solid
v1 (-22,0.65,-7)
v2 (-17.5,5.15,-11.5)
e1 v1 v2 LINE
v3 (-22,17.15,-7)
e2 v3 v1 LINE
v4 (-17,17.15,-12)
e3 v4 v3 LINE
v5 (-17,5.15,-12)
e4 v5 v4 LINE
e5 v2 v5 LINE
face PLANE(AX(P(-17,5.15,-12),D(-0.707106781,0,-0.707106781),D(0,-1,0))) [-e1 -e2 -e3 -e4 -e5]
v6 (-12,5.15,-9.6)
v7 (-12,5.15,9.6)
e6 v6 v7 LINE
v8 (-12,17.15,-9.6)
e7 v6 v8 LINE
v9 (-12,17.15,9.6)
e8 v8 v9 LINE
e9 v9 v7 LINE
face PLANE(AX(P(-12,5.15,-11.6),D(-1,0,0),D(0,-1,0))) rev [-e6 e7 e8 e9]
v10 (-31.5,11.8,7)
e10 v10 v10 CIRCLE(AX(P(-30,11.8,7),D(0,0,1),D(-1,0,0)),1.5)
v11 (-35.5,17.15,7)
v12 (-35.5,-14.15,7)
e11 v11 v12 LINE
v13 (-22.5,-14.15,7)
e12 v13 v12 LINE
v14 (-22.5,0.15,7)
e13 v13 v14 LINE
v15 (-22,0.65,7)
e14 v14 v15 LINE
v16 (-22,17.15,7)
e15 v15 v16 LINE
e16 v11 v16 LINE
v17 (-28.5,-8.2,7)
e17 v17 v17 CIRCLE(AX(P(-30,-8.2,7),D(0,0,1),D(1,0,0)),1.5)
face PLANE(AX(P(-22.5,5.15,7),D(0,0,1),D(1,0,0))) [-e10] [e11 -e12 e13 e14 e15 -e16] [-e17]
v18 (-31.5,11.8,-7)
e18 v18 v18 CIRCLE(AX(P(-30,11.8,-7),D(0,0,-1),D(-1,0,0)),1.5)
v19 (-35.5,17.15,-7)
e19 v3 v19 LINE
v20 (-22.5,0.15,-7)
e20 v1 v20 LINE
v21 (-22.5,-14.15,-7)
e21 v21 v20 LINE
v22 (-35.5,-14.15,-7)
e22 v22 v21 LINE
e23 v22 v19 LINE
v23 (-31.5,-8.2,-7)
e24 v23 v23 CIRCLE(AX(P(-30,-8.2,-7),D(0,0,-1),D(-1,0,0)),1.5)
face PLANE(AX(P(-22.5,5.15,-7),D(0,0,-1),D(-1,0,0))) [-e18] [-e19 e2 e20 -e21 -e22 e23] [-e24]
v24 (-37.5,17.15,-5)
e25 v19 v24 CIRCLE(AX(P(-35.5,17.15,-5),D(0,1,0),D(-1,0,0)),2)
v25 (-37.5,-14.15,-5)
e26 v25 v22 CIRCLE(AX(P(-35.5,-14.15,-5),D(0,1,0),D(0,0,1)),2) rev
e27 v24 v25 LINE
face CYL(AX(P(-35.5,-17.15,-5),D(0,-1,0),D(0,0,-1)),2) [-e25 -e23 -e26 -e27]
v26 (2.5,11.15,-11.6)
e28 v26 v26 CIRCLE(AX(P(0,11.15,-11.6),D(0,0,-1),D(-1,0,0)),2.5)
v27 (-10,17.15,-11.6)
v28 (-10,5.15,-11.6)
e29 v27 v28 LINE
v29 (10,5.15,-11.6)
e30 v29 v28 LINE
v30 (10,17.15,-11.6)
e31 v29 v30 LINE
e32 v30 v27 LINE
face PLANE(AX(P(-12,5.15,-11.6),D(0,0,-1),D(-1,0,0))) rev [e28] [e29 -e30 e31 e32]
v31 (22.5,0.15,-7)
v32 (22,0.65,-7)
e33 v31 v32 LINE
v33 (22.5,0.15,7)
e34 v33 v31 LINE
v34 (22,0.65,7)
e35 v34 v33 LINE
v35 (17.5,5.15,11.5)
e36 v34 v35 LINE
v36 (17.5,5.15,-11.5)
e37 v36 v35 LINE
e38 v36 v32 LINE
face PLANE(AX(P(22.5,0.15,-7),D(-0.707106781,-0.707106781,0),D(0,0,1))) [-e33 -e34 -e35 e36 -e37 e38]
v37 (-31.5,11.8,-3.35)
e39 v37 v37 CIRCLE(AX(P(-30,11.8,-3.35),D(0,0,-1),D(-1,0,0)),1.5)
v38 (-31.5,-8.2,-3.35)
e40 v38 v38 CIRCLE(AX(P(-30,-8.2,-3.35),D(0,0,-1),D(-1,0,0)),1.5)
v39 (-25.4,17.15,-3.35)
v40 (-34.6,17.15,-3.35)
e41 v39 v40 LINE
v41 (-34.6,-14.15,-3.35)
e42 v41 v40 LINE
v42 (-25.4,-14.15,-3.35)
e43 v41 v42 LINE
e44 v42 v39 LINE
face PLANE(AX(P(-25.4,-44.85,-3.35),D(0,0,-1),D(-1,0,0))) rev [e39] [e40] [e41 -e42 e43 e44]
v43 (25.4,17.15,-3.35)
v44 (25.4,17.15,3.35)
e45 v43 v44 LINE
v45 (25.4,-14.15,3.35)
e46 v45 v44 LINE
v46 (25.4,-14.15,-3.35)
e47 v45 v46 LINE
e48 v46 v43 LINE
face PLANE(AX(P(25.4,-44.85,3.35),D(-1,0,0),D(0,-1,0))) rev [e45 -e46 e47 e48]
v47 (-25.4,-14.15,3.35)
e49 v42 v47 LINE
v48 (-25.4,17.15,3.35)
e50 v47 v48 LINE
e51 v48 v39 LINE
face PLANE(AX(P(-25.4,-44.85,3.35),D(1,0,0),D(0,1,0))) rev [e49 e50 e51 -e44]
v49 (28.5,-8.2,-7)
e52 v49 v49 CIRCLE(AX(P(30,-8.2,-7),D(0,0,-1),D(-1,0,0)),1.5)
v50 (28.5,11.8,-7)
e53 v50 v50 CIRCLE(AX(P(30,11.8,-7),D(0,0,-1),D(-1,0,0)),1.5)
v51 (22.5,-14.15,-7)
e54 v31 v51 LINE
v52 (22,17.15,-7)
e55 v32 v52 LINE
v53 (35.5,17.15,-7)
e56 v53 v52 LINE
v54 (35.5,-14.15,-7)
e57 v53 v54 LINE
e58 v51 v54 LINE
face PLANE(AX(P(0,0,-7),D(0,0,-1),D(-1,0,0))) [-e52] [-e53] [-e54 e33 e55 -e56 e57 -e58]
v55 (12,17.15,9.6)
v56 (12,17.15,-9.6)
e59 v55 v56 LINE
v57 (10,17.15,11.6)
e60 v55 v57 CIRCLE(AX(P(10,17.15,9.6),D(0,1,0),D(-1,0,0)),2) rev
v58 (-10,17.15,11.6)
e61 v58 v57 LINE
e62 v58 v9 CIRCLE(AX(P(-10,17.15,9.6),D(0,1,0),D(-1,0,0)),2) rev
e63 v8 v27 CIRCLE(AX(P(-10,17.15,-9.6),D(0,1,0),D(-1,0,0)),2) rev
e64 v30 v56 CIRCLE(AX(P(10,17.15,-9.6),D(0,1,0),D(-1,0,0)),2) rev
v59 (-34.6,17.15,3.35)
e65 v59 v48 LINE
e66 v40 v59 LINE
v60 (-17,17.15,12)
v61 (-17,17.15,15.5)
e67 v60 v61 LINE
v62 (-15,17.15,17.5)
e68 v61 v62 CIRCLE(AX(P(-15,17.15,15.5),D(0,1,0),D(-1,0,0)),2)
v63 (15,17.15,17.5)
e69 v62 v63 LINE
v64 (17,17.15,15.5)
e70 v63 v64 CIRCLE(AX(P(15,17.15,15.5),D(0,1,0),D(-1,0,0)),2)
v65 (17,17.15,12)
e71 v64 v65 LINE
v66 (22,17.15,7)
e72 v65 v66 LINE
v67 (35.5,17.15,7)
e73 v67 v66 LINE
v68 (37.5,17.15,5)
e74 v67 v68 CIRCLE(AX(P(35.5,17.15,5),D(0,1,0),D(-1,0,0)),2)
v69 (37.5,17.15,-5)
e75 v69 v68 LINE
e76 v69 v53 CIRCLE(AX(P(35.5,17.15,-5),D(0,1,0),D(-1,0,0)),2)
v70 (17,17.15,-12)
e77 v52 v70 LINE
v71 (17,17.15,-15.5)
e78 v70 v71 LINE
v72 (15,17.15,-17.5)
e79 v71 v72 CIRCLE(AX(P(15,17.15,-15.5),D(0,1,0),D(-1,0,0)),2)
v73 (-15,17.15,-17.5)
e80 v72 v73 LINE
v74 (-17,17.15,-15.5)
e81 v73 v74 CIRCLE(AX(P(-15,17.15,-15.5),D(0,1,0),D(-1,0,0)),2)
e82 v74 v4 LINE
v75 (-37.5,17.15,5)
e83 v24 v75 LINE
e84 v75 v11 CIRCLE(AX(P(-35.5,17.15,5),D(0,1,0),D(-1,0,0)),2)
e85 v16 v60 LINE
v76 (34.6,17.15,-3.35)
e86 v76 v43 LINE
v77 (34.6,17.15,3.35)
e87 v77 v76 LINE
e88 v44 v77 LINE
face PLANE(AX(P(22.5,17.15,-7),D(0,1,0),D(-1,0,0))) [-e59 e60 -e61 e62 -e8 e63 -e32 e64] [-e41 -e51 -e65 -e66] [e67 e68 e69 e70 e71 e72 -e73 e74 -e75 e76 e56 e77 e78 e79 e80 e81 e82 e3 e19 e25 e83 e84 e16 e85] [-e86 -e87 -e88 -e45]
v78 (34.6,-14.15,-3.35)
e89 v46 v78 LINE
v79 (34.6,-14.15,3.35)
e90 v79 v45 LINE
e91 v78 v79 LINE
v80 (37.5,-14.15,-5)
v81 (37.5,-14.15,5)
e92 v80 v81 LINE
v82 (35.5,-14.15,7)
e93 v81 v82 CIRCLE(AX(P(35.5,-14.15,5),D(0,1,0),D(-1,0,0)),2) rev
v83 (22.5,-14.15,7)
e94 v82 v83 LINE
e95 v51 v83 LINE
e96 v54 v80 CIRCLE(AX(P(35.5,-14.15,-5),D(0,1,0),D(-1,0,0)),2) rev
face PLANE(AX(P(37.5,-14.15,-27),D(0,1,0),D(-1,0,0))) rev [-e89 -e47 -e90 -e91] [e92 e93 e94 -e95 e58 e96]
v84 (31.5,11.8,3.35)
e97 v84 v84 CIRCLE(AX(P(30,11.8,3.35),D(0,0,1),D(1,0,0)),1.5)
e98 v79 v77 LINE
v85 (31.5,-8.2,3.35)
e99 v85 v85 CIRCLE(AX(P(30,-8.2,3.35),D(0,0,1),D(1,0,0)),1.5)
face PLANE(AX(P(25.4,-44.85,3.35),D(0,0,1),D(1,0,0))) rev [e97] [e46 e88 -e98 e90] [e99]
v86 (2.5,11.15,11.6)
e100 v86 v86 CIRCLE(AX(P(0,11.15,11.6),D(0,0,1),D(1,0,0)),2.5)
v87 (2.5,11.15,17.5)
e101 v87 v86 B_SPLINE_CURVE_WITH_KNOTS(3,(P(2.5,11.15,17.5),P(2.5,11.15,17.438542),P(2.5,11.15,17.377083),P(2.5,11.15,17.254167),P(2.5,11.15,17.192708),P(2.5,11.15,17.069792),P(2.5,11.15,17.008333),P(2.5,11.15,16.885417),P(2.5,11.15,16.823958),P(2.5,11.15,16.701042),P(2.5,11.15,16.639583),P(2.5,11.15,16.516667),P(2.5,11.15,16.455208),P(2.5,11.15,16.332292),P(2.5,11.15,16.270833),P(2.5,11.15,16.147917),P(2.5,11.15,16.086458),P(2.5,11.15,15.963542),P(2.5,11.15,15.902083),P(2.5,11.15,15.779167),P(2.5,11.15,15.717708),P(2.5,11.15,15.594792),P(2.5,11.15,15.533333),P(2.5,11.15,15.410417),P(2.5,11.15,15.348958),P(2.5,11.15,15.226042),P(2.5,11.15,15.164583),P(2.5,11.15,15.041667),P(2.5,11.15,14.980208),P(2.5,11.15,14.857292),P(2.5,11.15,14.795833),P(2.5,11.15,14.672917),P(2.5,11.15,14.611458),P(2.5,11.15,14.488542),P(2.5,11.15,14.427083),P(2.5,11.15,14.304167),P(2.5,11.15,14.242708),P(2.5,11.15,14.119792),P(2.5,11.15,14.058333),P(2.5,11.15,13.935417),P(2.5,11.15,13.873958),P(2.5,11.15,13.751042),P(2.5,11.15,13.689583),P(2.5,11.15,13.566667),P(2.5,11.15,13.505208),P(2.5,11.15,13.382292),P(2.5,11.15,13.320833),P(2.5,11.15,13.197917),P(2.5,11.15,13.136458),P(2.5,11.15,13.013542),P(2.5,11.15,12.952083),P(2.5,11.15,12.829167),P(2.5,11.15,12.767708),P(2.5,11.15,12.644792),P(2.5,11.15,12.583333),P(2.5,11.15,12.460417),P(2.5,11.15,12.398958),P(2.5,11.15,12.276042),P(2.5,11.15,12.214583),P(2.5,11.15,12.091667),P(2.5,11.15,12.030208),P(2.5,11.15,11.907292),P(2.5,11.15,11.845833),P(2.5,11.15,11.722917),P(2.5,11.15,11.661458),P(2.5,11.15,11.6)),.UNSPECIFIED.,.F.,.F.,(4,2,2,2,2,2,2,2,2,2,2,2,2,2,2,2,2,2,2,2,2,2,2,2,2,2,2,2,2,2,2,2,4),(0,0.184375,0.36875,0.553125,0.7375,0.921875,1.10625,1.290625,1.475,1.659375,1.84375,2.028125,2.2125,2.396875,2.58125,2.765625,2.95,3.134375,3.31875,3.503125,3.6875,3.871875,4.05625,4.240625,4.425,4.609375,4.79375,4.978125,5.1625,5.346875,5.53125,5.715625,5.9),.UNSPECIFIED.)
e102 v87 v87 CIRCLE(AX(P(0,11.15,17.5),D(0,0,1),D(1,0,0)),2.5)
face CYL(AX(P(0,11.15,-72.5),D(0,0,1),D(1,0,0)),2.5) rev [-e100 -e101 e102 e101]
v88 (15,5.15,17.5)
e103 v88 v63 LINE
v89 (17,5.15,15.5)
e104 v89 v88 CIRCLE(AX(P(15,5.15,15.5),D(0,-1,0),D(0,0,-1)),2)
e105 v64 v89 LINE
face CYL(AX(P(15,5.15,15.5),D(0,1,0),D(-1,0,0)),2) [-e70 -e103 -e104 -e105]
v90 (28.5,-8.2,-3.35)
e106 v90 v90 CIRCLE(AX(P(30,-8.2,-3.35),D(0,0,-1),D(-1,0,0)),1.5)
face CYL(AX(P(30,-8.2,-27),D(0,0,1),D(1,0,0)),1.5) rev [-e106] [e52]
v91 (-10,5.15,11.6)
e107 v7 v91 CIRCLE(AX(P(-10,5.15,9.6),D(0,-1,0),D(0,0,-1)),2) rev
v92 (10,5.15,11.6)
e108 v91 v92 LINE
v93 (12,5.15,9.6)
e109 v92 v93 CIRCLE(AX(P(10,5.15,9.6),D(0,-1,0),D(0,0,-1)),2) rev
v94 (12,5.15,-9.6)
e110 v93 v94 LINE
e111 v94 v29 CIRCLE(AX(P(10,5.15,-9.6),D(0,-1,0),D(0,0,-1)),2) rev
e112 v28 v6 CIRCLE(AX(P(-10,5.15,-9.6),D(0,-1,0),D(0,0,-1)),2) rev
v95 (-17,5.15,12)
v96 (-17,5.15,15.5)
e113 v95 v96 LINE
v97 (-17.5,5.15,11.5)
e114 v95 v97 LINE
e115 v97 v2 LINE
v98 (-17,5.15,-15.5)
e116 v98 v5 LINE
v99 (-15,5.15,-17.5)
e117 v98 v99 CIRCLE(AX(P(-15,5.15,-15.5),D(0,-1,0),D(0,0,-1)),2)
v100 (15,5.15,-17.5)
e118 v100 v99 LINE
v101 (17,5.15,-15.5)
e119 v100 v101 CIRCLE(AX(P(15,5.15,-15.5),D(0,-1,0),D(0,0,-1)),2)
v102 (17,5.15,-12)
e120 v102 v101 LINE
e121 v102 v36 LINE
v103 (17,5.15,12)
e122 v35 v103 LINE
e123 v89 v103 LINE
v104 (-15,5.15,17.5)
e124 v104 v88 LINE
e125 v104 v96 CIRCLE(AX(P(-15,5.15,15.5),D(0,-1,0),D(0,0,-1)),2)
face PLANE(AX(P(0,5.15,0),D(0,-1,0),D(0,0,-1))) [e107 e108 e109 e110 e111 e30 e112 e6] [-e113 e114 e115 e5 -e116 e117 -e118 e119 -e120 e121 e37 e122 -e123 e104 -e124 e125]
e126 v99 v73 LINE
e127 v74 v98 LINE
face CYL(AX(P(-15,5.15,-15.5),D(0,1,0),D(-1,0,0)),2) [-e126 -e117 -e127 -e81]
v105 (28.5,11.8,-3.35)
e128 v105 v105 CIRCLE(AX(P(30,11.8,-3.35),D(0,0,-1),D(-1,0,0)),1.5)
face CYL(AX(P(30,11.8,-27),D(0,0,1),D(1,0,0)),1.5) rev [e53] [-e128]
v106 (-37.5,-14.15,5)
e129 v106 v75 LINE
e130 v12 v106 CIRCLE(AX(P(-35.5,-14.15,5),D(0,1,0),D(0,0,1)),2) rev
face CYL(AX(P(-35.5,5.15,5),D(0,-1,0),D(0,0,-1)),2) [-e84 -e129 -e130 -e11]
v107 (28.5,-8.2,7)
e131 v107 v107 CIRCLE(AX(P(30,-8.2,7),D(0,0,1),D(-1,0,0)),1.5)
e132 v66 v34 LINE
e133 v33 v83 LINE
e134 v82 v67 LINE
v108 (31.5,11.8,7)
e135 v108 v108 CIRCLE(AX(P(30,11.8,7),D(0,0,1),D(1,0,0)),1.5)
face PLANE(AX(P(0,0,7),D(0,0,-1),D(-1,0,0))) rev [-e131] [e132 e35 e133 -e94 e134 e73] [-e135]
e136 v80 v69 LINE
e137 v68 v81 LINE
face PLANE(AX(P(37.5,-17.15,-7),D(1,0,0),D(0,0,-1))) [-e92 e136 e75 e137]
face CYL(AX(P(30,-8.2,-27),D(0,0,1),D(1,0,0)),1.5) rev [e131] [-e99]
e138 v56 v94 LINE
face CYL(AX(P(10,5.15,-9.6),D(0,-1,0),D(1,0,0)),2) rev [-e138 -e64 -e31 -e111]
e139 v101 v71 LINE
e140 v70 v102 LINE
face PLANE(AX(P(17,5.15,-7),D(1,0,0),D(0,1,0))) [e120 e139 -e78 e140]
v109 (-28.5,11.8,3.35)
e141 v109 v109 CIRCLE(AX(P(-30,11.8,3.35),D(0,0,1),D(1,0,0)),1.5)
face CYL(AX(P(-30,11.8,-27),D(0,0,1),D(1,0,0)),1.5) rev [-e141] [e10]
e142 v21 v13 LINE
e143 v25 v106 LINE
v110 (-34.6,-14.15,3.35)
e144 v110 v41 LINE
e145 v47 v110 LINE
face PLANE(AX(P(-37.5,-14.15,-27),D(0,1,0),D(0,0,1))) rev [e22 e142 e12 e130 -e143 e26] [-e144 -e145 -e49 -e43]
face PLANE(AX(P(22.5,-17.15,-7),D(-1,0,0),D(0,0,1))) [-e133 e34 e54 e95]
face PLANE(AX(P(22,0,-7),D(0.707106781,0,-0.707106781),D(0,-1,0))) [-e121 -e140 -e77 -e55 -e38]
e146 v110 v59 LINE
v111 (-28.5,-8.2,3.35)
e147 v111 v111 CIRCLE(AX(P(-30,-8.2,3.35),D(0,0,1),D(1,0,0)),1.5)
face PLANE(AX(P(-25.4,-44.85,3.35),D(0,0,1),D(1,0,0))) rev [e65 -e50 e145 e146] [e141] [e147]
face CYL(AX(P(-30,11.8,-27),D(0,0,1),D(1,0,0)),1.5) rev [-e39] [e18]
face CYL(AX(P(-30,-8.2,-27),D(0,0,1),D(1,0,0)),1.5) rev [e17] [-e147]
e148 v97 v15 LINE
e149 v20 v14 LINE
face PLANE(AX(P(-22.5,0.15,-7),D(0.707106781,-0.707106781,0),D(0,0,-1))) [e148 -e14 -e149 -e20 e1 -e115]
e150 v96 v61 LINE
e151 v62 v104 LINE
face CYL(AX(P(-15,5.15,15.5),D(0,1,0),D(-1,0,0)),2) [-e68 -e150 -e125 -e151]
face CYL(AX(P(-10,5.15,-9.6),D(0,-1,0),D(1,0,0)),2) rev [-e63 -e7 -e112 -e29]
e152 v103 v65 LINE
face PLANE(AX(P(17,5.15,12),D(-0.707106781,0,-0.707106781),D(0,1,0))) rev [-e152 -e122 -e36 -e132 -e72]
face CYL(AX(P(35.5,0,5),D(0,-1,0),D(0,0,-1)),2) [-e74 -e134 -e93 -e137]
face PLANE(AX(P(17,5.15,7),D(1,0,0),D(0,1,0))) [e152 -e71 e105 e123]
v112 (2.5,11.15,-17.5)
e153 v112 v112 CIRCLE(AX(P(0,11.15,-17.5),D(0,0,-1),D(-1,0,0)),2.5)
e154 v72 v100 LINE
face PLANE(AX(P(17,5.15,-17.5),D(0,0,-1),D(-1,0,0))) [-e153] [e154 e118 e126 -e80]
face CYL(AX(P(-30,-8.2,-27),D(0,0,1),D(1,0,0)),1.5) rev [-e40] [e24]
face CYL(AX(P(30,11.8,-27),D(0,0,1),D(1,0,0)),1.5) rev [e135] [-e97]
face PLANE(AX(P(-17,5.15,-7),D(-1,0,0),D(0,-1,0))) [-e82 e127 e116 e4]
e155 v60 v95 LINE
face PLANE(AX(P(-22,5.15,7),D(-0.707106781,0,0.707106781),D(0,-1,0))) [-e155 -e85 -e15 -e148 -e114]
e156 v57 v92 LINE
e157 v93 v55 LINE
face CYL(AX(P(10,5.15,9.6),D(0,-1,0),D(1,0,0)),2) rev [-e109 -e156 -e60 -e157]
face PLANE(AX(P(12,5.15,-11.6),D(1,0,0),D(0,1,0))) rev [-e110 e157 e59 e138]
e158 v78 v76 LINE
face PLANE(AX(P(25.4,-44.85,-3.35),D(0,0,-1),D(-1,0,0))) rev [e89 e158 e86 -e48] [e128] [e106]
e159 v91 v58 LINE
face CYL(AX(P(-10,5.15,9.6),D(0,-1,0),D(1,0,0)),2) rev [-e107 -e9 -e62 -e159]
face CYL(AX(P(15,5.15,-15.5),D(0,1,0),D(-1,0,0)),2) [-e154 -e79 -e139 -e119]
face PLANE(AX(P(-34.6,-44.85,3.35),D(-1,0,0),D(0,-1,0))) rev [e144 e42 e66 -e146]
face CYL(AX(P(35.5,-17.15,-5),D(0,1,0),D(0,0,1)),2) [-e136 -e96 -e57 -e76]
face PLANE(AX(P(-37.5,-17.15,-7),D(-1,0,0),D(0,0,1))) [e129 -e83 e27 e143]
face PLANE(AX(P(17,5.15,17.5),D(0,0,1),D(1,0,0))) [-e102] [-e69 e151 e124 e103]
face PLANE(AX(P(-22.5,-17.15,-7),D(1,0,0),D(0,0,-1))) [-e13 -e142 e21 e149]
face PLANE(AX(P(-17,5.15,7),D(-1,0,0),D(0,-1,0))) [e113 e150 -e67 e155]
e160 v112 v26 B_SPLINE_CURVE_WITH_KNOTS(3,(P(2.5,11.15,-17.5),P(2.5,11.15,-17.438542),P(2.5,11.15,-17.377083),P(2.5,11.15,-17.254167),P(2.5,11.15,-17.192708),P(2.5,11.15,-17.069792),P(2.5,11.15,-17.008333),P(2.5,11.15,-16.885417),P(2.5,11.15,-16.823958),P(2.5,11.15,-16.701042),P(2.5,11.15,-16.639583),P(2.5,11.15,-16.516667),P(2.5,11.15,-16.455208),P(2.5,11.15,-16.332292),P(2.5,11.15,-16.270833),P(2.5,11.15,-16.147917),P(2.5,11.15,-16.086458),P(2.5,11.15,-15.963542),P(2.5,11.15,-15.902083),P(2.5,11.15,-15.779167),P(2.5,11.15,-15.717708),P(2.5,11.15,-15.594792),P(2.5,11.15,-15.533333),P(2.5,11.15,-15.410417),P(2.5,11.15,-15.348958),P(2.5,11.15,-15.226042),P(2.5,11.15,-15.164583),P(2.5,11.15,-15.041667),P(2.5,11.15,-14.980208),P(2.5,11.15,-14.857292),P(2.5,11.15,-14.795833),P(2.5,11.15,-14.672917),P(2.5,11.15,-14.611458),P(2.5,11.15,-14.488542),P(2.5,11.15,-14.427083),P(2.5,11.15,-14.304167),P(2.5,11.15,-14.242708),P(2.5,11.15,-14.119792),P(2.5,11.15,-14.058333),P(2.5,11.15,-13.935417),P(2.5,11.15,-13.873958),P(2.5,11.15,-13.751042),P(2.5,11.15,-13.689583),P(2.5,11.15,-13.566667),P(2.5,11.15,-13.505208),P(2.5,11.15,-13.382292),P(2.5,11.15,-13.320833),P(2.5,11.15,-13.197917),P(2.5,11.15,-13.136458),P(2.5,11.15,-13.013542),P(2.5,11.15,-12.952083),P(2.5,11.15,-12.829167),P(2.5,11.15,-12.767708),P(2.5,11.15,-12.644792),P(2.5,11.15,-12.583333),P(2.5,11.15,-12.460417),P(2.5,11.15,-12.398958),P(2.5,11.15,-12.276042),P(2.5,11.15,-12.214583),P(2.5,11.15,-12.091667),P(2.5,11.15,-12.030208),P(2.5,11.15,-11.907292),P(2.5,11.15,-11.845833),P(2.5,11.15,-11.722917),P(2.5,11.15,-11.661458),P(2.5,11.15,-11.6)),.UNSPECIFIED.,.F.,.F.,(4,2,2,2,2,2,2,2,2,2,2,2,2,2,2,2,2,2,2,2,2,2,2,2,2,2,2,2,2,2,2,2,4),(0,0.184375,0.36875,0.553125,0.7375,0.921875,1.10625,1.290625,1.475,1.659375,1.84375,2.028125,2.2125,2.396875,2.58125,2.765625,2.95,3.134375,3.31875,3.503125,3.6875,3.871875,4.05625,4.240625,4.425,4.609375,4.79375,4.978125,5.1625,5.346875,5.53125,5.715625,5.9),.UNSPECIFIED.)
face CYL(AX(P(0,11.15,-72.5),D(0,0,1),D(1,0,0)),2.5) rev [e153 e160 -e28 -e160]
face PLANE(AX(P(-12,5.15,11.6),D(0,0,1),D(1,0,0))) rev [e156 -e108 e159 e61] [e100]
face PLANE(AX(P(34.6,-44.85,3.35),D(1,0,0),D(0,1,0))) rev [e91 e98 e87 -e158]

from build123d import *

# Parameters (mm, degrees)
EXTRUDE_1_DEPTH        = 7
EXTRUDE_1_DEPTH_BACK   = 7
SKETCH_1_W             = 15
SKETCH_1_H             = 34.3
EXTRUDE_1_2_DEPTH      = 7
EXTRUDE_1_2_DEPTH_BACK = 7
SKETCH_2_W             = 9.2
SKETCH_2_H             = 6.7
CUT_EXTRUDE_1_DEPTH    = 62
SKETCH_3_W             = 24
SKETCH_3_H             = 23.2
EXTRUDE_2_DEPTH        = 12
SKETCH_4_R             = 2.5
CUT_EXTRUDE_2_DEPTH    = 90
FILLET_1_R             = 2
CHAMFER_1_SIZE         = 5
CHAMFER_2_SIZE         = 5
FILLET_2_R             = 2
SKETCH_7_R             = 1.5
CUT_EXTRUDE_3_DEPTH    = 34
SKETCH_9_W             = 15
SKETCH_9_H             = 3
CUT_EXTRUDE_4_DEPTH    = 34


with BuildPart() as part:
    # 草图1 → 凸台-拉伸1 (new, two sides: drawn at the far end of the back side and taken through both)
    with BuildSketch(Plane.XY.offset(-EXTRUDE_1_DEPTH_BACK)):
        with Locations((30, 0)):
            Rectangle(SKETCH_1_W, SKETCH_1_H)
    extrude(amount=EXTRUDE_1_DEPTH + EXTRUDE_1_DEPTH_BACK)


with BuildPart() as body_2:
    # 草图1 → Extrude 1 2 (new, two sides: drawn at the far end of the back side and taken through both)
    with BuildSketch(Plane.XY.offset(-EXTRUDE_1_2_DEPTH_BACK)):
        with Locations((-30, 0)):
            Rectangle(SKETCH_1_W, SKETCH_1_H)
    extrude(amount=EXTRUDE_1_2_DEPTH + EXTRUDE_1_2_DEPTH_BACK)


with BuildPart() as cut_extrude_1_tool:
    # 草图2 → 切除-拉伸1 (new body)
    with BuildSketch(Plane(origin=(0, 17.15, 0), x_dir=(1, 0, 0), z_dir=(0, 1, 0))):
        with Locations((30, 0)):
            Rectangle(SKETCH_2_W, SKETCH_2_H)
        with Locations((-30, 0)):
            Rectangle(SKETCH_2_W, SKETCH_2_H)
    extrude(amount=-CUT_EXTRUDE_1_DEPTH)


with BuildPart() as part_1:
    add(part.part)

    # 切除-拉伸1: cut by cut_extrude_1_tool
    add(cut_extrude_1_tool.part, mode=Mode.SUBTRACT)



with BuildPart() as body_2_1:
    add(body_2.part)

    # 切除-拉伸1: cut by cut_extrude_1_tool
    add(cut_extrude_1_tool.part, mode=Mode.SUBTRACT)


with BuildPart() as part_2:
    add(part_1.part)

    add(body_2_1.part)  # 凸台-拉伸2 merges body 2
    # 草图3 → 凸台-拉伸2 (add)
    with BuildSketch(Plane(origin=(0, 17.15, 0), x_dir=(1, 0, 0), z_dir=(0, 1, 0))):
        Polygon((22.5, 7), (17, 7), (17, 17.5), (-17, 17.5), (-17, 7), (-22.5, 7), (-22.5, -7), (-17, -7), (-17, -17.5), (17, -17.5), (17, -7), (22.5, -7), align=None)
        Rectangle(SKETCH_3_W, SKETCH_3_H, mode=Mode.SUBTRACT)
    extrude(amount=-EXTRUDE_2_DEPTH)

    # 草图4 → 切除-拉伸2 (cut)
    with BuildSketch(Plane.XY.offset(17.5)):
        with Locations((0, 11.15)):
            Circle(SKETCH_4_R)
    extrude(amount=-CUT_EXTRUDE_2_DEPTH, mode=Mode.SUBTRACT)

    # 圆角1
    fillet_1_edges = [part_2.edges().sort_by_distance(p)[0] for p in [
        (-37.5, 0, -7),
        (-37.5, 0, 7),
        (37.5, 0, 7),
        (37.5, 0, -7),
    ]]
    fillet(fillet_1_edges, radius=FILLET_1_R)

    # 倒角1
    chamfer_1_edges = [part_2.edges().sort_by_distance(p)[0] for p in [
        (22.5, 5.15, 0),
        (-22.5, 5.15, 0),
    ]]
    chamfer(chamfer_1_edges, length=CHAMFER_1_SIZE)

    # 倒角2
    # the kernel refuses this chamfer: 5 mm, written as the material it adds along each edge
    with BuildSketch(Plane(origin=(17, 17.15, -7), x_dir=(0.9996219169112968, 0, 0.027495876610586147), z_dir=(0, -1, 0))) as chamfer_2_piece_1_section:
        Polygon((CHAMFER_2_SIZE * 0.999621916911, -CHAMFER_2_SIZE * 0.0274958766106), (-CHAMFER_2_SIZE * 0.0274958766106, -CHAMFER_2_SIZE * 0.999621916911), (0, 0), align=None)
    chamfer_2_piece_1 = extrude(amount=12, mode=Mode.PRIVATE)
    chamfer_2_piece_1 = split(chamfer_2_piece_1, bisect_by=Plane(origin=(15.061953737, 7.588046263, -8.643148294), z_dir=(0.7071067811865476, 0.7071067811865475, 0)), keep=Keep.TOP, mode=Mode.PRIVATE)
    add(chamfer_2_piece_1)
    with BuildSketch(Plane(origin=(17, 17.15, -7), x_dir=(0.9996219169112968, 0, 0.027495876610586147), z_dir=(0, -1, 0))) as chamfer_2_piece_2_section:
        Polygon((CHAMFER_2_SIZE * 0.999621916911, -CHAMFER_2_SIZE * 0.0274958766106), (-CHAMFER_2_SIZE * 0.0274958766106, -CHAMFER_2_SIZE * 0.999621916911), (0, 0), align=None)
    chamfer_2_piece_2 = extrude(amount=12, mode=Mode.PRIVATE)
    chamfer_2_piece_2 = split(chamfer_2_piece_2, bisect_by=Plane(origin=(17.181894142, 5.468105858, -9.627776216), z_dir=(-0.7071067811865476, -0.7071067811865475, 0)), keep=Keep.TOP, mode=Mode.PRIVATE)
    add(chamfer_2_piece_2)
    with BuildSketch(Plane(origin=(17, 17.15, -7), x_dir=(0.9996219169112968, 0, 0.027495876610586147), z_dir=(0, -1, 0))) as chamfer_2_piece_3_section:
        Polygon((CHAMFER_2_SIZE * 0.999621916911, -CHAMFER_2_SIZE * 0.0274958766106), (-CHAMFER_2_SIZE * 0.0274958766106, -CHAMFER_2_SIZE * 0.999621916911), (0, 0), align=None)
    chamfer_2_piece_3 = extrude(amount=24.85841494, mode=Mode.PRIVATE)
    chamfer_2_piece_3 = split(chamfer_2_piece_3, bisect_by=Plane(origin=(19.269171179, 3.380828821, -8.010149173), z_dir=(0.7071067811865476, 0.7071067811865475, 0)), keep=Keep.TOP, mode=Mode.PRIVATE)
    chamfer_2_piece_3 = split(chamfer_2_piece_3, bisect_by=Plane(origin=(19.858894906, 5.15, -8.010149173), z_dir=(0, -1, 0)), keep=Keep.TOP, mode=Mode.PRIVATE)
    add(chamfer_2_piece_3)
    with BuildSketch(Plane(origin=(-17, 17.15, -7), x_dir=(0.027495876610586313, 0, -0.9996219169112968), z_dir=(0, -1, 0))) as chamfer_2_piece_4_section:
        Polygon((CHAMFER_2_SIZE * 0.999621916911, -CHAMFER_2_SIZE * 0.0274958766106), (-CHAMFER_2_SIZE * 0.0274958766106, -CHAMFER_2_SIZE * 0.999621916911), (0, 0), align=None)
    chamfer_2_piece_4 = extrude(amount=12, mode=Mode.PRIVATE)
    chamfer_2_piece_4 = split(chamfer_2_piece_4, bisect_by=Plane(origin=(-15.061953737, 7.588046263, -8.643148294), z_dir=(-0.7071067811865475, 0.7071067811865476, 0)), keep=Keep.TOP, mode=Mode.PRIVATE)
    add(chamfer_2_piece_4)
    with BuildSketch(Plane(origin=(-17, 17.15, -7), x_dir=(0.027495876610586313, 0, -0.9996219169112968), z_dir=(0, -1, 0))) as chamfer_2_piece_5_section:
        Polygon((CHAMFER_2_SIZE * 0.999621916911, -CHAMFER_2_SIZE * 0.0274958766106), (-CHAMFER_2_SIZE * 0.0274958766106, -CHAMFER_2_SIZE * 0.999621916911), (0, 0), align=None)
    chamfer_2_piece_5 = extrude(amount=24.85841494, mode=Mode.PRIVATE)
    chamfer_2_piece_5 = split(chamfer_2_piece_5, bisect_by=Plane(origin=(-19.858894906, 5.15, -8.010149173), z_dir=(0, -1, 0)), keep=Keep.TOP, mode=Mode.PRIVATE)
    chamfer_2_piece_5 = split(chamfer_2_piece_5, bisect_by=Plane(origin=(-19.269171179, 3.380828821, -8.010149173), z_dir=(-0.7071067811865475, 0.7071067811865476, 0)), keep=Keep.TOP, mode=Mode.PRIVATE)
    add(chamfer_2_piece_5)
    with BuildSketch(Plane(origin=(-17, 17.15, -7), x_dir=(0.027495876610586313, 0, -0.9996219169112968), z_dir=(0, -1, 0))) as chamfer_2_piece_6_section:
        Polygon((CHAMFER_2_SIZE * 0.999621916911, -CHAMFER_2_SIZE * 0.0274958766106), (-CHAMFER_2_SIZE * 0.0274958766106, -CHAMFER_2_SIZE * 0.999621916911), (0, 0), align=None)
    chamfer_2_piece_6 = extrude(amount=12, mode=Mode.PRIVATE)
    chamfer_2_piece_6 = split(chamfer_2_piece_6, bisect_by=Plane(origin=(-17.181894142, 5.468105858, -9.627776216), z_dir=(0.7071067811865475, -0.7071067811865476, 0)), keep=Keep.TOP, mode=Mode.PRIVATE)
    add(chamfer_2_piece_6)
    with BuildSketch(Plane(origin=(17, 17.15, 7), x_dir=(0.9996219169112968, 0, -0.027495876610586147), z_dir=(0, -1, 0))) as chamfer_2_piece_7_section:
        Polygon((CHAMFER_2_SIZE * 0.999621916911, CHAMFER_2_SIZE * 0.0274958766106), (-CHAMFER_2_SIZE * 0.0274958766106, CHAMFER_2_SIZE * 0.999621916911), (0, 0), align=None)
    chamfer_2_piece_7 = extrude(amount=12, mode=Mode.PRIVATE)
    chamfer_2_piece_7 = split(chamfer_2_piece_7, bisect_by=Plane(origin=(15.061953737, 7.588046263, 8.643148294), z_dir=(0.7071067811865476, 0.7071067811865475, 0)), keep=Keep.TOP, mode=Mode.PRIVATE)
    add(chamfer_2_piece_7)
    with BuildSketch(Plane(origin=(17, 17.15, 7), x_dir=(0.9996219169112968, 0, -0.027495876610586147), z_dir=(0, -1, 0))) as chamfer_2_piece_8_section:
        Polygon((CHAMFER_2_SIZE * 0.999621916911, CHAMFER_2_SIZE * 0.0274958766106), (-CHAMFER_2_SIZE * 0.0274958766106, CHAMFER_2_SIZE * 0.999621916911), (0, 0), align=None)
    chamfer_2_piece_8 = extrude(amount=12, mode=Mode.PRIVATE)
    chamfer_2_piece_8 = split(chamfer_2_piece_8, bisect_by=Plane(origin=(17.181894142, 5.468105858, 9.627776216), z_dir=(-0.7071067811865476, -0.7071067811865475, 0)), keep=Keep.TOP, mode=Mode.PRIVATE)
    add(chamfer_2_piece_8)
    with BuildSketch(Plane(origin=(17, 17.15, 7), x_dir=(0.9996219169112968, 0, -0.027495876610586147), z_dir=(0, -1, 0))) as chamfer_2_piece_9_section:
        Polygon((CHAMFER_2_SIZE * 0.999621916911, CHAMFER_2_SIZE * 0.0274958766106), (-CHAMFER_2_SIZE * 0.0274958766106, CHAMFER_2_SIZE * 0.999621916911), (0, 0), align=None)
    chamfer_2_piece_9 = extrude(amount=24.85841494, mode=Mode.PRIVATE)
    chamfer_2_piece_9 = split(chamfer_2_piece_9, bisect_by=Plane(origin=(19.269171179, 3.380828821, 8.010149173), z_dir=(0.7071067811865476, 0.7071067811865475, 0)), keep=Keep.TOP, mode=Mode.PRIVATE)
    chamfer_2_piece_9 = split(chamfer_2_piece_9, bisect_by=Plane(origin=(19.858894906, 5.15, 8.010149173), z_dir=(0, -1, 0)), keep=Keep.TOP, mode=Mode.PRIVATE)
    add(chamfer_2_piece_9)
    with BuildSketch(Plane(origin=(-17, 17.15, 7), x_dir=(0.027495876610586313, 0, 0.9996219169112968), z_dir=(0, -1, 0))) as chamfer_2_piece_10_section:
        Polygon((CHAMFER_2_SIZE * 0.999621916911, CHAMFER_2_SIZE * 0.0274958766106), (-CHAMFER_2_SIZE * 0.0274958766106, CHAMFER_2_SIZE * 0.999621916911), (0, 0), align=None)
    chamfer_2_piece_10 = extrude(amount=12, mode=Mode.PRIVATE)
    chamfer_2_piece_10 = split(chamfer_2_piece_10, bisect_by=Plane(origin=(-15.061953737, 7.588046263, 8.643148294), z_dir=(-0.7071067811865475, 0.7071067811865476, 0)), keep=Keep.TOP, mode=Mode.PRIVATE)
    add(chamfer_2_piece_10)
    with BuildSketch(Plane(origin=(-17, 17.15, 7), x_dir=(0.027495876610586313, 0, 0.9996219169112968), z_dir=(0, -1, 0))) as chamfer_2_piece_11_section:
        Polygon((CHAMFER_2_SIZE * 0.999621916911, CHAMFER_2_SIZE * 0.0274958766106), (-CHAMFER_2_SIZE * 0.0274958766106, CHAMFER_2_SIZE * 0.999621916911), (0, 0), align=None)
    chamfer_2_piece_11 = extrude(amount=24.85841494, mode=Mode.PRIVATE)
    chamfer_2_piece_11 = split(chamfer_2_piece_11, bisect_by=Plane(origin=(-19.858894906, 5.15, 8.010149173), z_dir=(0, -1, 0)), keep=Keep.TOP, mode=Mode.PRIVATE)
    chamfer_2_piece_11 = split(chamfer_2_piece_11, bisect_by=Plane(origin=(-19.269171179, 3.380828821, 8.010149173), z_dir=(-0.7071067811865475, 0.7071067811865476, 0)), keep=Keep.TOP, mode=Mode.PRIVATE)
    add(chamfer_2_piece_11)
    with BuildSketch(Plane(origin=(-17, 17.15, 7), x_dir=(0.027495876610586313, 0, 0.9996219169112968), z_dir=(0, -1, 0))) as chamfer_2_piece_12_section:
        Polygon((CHAMFER_2_SIZE * 0.999621916911, CHAMFER_2_SIZE * 0.0274958766106), (-CHAMFER_2_SIZE * 0.0274958766106, CHAMFER_2_SIZE * 0.999621916911), (0, 0), align=None)
    chamfer_2_piece_12 = extrude(amount=12, mode=Mode.PRIVATE)
    chamfer_2_piece_12 = split(chamfer_2_piece_12, bisect_by=Plane(origin=(-17.181894142, 5.468105858, 9.627776216), z_dir=(0.7071067811865475, -0.7071067811865476, 0)), keep=Keep.TOP, mode=Mode.PRIVATE)
    add(chamfer_2_piece_12)

    # 圆角2
    fillet_2_edges = [part_2.edges().sort_by_distance(p)[0] for p in [
        (17, 11.15, 17.5),
        (-17, 11.15, 17.5),
        (-17, 11.15, -17.5),
        (17, 11.15, -17.5),
        (12, 11.15, 11.6),
        (-12, 11.15, 11.6),
        (-12, 11.15, -11.6),
        (12, 11.15, -11.6),
    ]]
    fillet(fillet_2_edges, radius=FILLET_2_R)

    # 草图7 → 切除-拉伸3 (cut)
    with BuildSketch(Plane.XY.offset(7)):
        with Locations(Location((30, 11.8, 0), (0, 0, 180))):
            Circle(SKETCH_7_R)
        with Locations(Location((30, -8.2, 0), (0, 0, 180))):
            Circle(SKETCH_7_R)
        with Locations(Location((-30, -8.2, 0), (0, 0, 180))):
            Circle(SKETCH_7_R)
        with Locations(Location((-30, 11.8, 0), (0, 0, 180))):
            Circle(SKETCH_7_R)
    extrude(amount=-CUT_EXTRUDE_3_DEPTH, mode=Mode.SUBTRACT)

    # 草图9 → 切除-拉伸4 (cut)
    with BuildSketch(Plane.XY.offset(7)):
        with Locations((-30, -15.65)):
            Rectangle(SKETCH_9_W, SKETCH_9_H)
        with Locations((30, -15.65)):
            Rectangle(SKETCH_9_W, SKETCH_9_H)
    extrude(amount=-CUT_EXTRUDE_4_DEPTH, mode=Mode.SUBTRACT)


solid = part_2.part
